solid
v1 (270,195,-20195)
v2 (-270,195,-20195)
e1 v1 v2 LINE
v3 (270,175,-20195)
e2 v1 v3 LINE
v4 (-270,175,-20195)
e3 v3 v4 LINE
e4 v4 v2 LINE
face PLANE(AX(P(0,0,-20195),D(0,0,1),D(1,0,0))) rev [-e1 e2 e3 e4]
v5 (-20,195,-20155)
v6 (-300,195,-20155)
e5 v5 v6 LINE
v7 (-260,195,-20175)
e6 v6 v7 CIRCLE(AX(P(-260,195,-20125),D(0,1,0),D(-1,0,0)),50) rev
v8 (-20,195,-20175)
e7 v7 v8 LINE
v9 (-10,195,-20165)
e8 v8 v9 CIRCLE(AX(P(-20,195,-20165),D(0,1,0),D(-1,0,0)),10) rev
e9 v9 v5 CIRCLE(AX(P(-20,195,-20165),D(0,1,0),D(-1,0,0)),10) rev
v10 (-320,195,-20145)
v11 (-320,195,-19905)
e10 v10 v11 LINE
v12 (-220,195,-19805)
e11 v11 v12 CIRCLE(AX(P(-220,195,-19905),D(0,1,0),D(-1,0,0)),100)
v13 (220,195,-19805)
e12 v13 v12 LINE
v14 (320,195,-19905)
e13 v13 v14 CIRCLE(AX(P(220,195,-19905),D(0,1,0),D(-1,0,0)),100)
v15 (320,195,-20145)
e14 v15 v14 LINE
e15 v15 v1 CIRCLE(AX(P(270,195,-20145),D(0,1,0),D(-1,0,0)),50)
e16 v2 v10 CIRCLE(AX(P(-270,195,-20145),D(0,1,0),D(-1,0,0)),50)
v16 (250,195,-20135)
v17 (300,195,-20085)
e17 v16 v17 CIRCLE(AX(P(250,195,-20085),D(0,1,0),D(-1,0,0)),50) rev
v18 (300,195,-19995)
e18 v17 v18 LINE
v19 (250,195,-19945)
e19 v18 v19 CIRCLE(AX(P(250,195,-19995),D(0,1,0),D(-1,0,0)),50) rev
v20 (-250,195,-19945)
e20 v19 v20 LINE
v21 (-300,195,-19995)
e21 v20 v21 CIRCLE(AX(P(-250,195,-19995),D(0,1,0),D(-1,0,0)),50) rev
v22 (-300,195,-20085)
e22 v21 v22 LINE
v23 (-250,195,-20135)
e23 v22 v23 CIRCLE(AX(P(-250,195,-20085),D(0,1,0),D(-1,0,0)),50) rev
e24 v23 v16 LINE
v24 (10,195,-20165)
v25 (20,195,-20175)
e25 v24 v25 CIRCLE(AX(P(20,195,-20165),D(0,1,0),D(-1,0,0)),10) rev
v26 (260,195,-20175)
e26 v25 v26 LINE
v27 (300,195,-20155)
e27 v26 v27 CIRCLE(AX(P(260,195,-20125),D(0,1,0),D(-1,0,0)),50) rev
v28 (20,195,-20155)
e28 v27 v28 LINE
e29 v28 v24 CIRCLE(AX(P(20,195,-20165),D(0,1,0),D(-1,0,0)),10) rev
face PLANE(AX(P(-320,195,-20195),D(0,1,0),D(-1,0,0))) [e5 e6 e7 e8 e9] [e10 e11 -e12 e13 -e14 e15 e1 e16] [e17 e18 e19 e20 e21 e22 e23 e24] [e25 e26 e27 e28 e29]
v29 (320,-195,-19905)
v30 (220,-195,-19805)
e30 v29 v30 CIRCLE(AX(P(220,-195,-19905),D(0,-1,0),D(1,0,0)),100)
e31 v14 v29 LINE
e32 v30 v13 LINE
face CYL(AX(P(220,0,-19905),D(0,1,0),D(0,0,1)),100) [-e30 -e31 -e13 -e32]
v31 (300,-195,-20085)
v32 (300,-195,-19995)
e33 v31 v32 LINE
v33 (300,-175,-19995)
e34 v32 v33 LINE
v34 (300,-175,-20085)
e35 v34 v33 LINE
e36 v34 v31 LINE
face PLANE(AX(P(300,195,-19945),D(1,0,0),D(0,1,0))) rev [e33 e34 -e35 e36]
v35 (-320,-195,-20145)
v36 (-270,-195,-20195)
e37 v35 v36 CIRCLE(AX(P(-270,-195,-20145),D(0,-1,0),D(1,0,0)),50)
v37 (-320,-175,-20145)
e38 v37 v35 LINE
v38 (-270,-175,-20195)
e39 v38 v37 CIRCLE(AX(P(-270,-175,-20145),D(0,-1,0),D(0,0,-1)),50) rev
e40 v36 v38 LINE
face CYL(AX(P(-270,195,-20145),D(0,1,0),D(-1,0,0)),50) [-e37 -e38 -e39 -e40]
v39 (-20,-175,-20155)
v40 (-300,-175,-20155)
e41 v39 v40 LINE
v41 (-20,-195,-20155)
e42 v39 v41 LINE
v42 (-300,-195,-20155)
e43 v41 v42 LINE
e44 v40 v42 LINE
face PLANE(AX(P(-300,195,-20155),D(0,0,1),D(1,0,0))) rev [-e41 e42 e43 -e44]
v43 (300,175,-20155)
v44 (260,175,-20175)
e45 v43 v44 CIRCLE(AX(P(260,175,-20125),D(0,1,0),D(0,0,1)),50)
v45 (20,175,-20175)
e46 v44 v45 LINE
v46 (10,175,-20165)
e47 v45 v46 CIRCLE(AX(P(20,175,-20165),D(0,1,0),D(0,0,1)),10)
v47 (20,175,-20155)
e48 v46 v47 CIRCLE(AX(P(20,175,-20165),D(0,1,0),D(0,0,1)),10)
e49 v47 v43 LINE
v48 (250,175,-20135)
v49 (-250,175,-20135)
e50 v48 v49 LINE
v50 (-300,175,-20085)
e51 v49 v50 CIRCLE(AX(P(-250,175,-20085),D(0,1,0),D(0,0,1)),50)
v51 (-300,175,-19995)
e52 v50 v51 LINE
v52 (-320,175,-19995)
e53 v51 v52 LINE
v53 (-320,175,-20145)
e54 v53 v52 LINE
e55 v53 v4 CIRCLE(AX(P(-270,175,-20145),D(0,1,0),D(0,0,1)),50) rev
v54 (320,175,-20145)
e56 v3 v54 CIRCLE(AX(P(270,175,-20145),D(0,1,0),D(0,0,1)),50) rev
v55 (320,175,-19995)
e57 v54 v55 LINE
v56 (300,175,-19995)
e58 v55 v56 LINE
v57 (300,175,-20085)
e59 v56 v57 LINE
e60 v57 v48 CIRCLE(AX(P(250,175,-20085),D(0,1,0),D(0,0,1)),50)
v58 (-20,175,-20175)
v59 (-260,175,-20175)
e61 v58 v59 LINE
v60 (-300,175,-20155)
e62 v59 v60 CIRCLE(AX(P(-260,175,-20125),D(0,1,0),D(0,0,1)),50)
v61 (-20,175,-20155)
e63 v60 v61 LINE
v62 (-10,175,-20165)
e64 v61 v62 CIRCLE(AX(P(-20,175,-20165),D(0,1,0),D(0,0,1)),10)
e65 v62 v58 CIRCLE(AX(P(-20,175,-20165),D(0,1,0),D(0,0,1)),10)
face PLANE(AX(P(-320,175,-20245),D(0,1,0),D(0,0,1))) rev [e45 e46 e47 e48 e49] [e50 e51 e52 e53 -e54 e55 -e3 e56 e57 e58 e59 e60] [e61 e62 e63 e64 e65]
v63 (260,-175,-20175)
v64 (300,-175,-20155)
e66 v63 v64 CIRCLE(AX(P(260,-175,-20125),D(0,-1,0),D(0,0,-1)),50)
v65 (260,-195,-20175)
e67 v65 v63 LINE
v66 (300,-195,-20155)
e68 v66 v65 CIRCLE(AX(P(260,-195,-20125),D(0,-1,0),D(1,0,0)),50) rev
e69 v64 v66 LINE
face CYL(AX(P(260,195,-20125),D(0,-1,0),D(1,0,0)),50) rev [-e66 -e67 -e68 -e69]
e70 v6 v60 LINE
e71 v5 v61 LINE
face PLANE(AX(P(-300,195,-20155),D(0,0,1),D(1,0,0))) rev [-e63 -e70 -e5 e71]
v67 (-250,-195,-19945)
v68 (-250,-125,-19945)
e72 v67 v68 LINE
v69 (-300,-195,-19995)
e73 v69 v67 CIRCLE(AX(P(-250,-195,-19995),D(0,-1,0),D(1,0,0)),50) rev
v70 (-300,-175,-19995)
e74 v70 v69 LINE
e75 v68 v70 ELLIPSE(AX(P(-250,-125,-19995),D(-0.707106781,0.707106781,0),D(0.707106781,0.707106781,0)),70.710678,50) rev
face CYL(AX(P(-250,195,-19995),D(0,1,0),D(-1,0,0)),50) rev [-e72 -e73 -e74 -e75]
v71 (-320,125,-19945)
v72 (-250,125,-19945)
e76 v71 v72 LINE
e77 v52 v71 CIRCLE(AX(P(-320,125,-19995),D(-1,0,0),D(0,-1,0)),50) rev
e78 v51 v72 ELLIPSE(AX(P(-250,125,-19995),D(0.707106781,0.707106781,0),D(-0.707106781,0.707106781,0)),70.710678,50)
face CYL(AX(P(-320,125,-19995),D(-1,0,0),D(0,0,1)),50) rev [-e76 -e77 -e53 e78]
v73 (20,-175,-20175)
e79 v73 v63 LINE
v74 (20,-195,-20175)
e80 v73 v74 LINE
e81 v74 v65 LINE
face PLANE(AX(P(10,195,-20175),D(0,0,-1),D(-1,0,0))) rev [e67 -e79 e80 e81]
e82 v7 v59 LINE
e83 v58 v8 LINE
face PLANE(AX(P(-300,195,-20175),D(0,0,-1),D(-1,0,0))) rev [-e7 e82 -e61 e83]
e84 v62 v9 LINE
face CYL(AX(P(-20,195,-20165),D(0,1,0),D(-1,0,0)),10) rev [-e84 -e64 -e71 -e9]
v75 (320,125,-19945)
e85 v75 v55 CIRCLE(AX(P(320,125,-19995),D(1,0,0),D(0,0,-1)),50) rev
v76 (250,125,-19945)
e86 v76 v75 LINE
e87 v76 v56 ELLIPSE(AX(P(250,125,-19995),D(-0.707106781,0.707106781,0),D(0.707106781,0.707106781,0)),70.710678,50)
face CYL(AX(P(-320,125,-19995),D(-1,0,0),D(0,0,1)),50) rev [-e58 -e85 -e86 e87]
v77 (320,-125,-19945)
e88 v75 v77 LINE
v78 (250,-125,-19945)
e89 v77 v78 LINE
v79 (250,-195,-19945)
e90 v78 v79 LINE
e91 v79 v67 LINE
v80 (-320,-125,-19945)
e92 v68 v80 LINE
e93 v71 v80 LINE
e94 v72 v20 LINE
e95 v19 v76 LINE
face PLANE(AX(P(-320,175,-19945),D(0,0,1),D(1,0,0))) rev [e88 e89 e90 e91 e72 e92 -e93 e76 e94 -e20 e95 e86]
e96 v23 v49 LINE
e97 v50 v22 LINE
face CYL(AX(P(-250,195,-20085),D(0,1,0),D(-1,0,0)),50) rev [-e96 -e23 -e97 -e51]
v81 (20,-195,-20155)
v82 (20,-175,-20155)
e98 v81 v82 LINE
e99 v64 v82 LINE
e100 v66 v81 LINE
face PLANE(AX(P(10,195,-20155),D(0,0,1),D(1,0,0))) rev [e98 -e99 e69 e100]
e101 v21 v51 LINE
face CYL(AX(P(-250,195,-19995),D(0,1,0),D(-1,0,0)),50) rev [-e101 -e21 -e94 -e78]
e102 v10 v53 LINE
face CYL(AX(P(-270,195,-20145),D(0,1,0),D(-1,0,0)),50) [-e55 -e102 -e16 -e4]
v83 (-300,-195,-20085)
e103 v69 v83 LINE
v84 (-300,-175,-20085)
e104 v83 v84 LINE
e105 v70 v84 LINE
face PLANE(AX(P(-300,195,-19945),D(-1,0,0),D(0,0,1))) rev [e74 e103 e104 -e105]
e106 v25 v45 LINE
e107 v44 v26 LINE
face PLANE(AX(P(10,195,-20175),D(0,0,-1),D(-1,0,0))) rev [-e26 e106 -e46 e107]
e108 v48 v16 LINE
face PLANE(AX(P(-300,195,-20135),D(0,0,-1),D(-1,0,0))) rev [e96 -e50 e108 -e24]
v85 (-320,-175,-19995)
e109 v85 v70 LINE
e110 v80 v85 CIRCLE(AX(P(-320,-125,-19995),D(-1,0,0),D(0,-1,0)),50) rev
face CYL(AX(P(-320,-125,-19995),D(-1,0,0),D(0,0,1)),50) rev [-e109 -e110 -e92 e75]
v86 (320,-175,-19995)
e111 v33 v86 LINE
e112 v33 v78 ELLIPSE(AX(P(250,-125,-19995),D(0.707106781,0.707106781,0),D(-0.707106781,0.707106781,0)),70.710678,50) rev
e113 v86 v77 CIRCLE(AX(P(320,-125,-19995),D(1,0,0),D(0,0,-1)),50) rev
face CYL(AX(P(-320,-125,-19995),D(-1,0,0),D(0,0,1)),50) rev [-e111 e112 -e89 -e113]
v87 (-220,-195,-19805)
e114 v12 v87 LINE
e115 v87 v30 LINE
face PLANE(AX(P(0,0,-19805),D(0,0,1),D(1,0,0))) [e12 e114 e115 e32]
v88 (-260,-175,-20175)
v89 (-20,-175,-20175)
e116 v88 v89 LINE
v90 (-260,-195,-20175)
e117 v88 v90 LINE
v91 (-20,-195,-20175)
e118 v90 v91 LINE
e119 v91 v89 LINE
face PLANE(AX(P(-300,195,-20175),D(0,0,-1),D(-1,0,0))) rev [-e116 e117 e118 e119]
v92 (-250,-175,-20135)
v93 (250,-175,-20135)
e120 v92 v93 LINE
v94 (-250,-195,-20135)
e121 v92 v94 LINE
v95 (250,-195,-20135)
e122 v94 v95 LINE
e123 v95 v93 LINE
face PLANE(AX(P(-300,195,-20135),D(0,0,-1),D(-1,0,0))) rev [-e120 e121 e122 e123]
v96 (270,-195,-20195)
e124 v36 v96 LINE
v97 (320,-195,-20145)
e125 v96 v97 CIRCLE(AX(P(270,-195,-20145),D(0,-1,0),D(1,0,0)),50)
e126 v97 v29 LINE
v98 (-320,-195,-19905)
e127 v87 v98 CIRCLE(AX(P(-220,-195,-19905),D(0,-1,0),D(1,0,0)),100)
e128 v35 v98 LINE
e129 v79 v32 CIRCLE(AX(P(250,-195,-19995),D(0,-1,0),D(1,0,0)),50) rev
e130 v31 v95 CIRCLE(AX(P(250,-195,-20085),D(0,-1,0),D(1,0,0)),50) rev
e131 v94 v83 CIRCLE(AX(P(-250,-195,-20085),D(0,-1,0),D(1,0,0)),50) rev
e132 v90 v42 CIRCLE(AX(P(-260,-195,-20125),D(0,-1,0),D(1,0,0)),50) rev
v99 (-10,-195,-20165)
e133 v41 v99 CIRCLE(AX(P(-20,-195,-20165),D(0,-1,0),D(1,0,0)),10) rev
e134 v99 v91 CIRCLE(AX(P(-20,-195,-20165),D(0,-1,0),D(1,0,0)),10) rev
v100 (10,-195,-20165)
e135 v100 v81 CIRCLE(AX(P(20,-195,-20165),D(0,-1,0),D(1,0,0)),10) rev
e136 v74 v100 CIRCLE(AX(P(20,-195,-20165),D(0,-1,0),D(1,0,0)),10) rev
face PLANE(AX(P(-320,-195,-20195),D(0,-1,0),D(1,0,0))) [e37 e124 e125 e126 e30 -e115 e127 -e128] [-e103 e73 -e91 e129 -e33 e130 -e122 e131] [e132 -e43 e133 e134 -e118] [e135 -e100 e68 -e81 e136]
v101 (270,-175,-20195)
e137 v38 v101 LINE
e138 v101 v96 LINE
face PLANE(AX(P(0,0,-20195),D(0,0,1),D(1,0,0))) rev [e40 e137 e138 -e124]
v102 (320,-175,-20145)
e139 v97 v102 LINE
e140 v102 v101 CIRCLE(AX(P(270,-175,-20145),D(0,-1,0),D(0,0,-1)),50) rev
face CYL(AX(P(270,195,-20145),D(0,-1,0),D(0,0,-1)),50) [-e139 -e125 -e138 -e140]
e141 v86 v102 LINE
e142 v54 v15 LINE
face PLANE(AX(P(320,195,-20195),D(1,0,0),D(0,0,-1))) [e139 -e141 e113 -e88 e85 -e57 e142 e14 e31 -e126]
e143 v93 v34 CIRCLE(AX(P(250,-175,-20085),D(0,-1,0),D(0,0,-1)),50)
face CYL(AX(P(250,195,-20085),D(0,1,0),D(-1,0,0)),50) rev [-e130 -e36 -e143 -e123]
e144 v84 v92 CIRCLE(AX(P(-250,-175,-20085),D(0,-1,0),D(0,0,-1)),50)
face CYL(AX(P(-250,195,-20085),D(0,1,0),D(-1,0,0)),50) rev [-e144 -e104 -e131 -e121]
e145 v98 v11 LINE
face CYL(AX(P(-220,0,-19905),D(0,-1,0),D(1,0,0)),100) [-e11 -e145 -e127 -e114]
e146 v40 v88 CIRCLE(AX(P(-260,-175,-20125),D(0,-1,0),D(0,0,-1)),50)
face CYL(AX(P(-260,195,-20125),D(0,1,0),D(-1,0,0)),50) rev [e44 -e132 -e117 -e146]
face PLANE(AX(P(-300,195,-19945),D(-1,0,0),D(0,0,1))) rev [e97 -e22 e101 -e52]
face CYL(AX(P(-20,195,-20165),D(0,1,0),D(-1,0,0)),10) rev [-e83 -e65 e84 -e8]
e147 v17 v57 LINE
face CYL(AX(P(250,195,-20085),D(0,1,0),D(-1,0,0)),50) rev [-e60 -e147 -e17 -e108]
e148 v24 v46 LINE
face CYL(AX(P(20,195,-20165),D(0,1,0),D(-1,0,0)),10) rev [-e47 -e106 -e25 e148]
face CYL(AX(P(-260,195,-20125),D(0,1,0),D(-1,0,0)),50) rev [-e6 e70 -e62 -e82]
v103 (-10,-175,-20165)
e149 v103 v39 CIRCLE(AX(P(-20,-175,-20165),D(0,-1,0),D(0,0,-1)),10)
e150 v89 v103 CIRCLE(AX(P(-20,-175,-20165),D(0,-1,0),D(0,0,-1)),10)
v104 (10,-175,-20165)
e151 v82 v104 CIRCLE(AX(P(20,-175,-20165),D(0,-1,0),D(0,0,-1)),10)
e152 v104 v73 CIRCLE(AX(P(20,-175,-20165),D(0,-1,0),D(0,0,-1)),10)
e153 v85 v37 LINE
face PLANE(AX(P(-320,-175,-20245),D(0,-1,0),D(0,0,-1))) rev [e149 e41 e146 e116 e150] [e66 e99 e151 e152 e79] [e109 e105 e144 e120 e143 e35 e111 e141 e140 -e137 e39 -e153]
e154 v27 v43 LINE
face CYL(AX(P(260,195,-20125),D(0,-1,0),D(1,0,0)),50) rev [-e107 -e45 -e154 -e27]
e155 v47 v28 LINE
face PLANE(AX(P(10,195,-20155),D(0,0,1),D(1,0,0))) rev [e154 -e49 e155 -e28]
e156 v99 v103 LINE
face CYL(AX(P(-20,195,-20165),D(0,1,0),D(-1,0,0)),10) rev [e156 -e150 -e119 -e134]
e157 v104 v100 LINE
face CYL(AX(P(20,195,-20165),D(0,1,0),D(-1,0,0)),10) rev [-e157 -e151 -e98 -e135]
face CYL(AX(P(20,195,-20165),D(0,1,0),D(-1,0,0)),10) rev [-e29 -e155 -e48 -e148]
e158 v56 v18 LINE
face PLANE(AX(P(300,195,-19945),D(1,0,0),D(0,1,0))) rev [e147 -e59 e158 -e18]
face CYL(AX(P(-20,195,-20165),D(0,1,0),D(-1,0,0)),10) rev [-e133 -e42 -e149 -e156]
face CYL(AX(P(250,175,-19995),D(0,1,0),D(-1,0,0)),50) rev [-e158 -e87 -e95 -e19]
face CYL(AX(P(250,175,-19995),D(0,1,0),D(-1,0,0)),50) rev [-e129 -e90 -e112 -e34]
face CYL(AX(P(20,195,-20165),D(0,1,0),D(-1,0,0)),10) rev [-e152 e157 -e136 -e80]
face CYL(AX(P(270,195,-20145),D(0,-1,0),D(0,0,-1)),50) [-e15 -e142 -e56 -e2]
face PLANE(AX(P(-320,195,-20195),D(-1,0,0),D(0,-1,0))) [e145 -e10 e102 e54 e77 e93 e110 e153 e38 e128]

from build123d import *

# Parameters (mm, degrees)
BOSS_EXTRUDE1_DEPTH      = 195
BOSS_EXTRUDE1_DEPTH_BACK = 195
BOSS_EXTRUDE1_START      = -20000
SKETCH1_W                = 640
SKETCH1_H                = 390
SKETCH2_W                = 300
SKETCH2_H                = 350
CUT_EXTRUDE1_DEPTH       = 20207.079530676
SKETCH3_W                = 290
SKETCH3_H                = 20
SKETCH3_W_2              = 600
SKETCH3_H_2              = 190
CUT_EXTRUDE2_DEPTH       = 20202.300081925
FILLET1_R                = 50
FILLET2_R                = 10
FILLET4_R                = 100


# Some blends are built 0.0001 mm under size
with BuildPart() as part:
    # Sketch1 → Boss-Extrude1 (new, two sides: drawn at the far end of the back side and taken through both)
    with BuildSketch(Plane.XY.offset(BOSS_EXTRUDE1_START - BOSS_EXTRUDE1_DEPTH_BACK)):
        Rectangle(SKETCH1_W, SKETCH1_H)
    extrude(amount=BOSS_EXTRUDE1_DEPTH + BOSS_EXTRUDE1_DEPTH_BACK)

    # Sketch2 → Cut-Extrude1 (cut, through all)
    with BuildSketch(Plane(origin=(320, 0, 0), x_dir=(0, 0, -1), z_dir=(1, 0, 0))):
        with Locations((20095, 0)):
            Rectangle(SKETCH2_W, SKETCH2_H)
    extrude(amount=-CUT_EXTRUDE1_DEPTH, mode=Mode.SUBTRACT)

    # Sketch3 → Cut-Extrude2 (cut, through all)
    with BuildSketch(Plane.XZ.offset(195)):
        with Locations((-155, -20165)):
            Rectangle(SKETCH3_W, SKETCH3_H)
        with Locations((155, -20165)):
            Rectangle(SKETCH3_W, SKETCH3_H)
        with Locations((0, -20040)):
            Rectangle(SKETCH3_W_2, SKETCH3_H_2)
    extrude(amount=-CUT_EXTRUDE2_DEPTH, mode=Mode.SUBTRACT)

    # Fillet1
    # the kernel refuses this fillet: 50 mm, written as the material it adds along each edge
    with BuildSketch(Plane(origin=(300, -195, -20135), x_dir=(-1, 0, 0), z_dir=(0, 1, 0)), Plane(origin=(-300, -195, -20135), x_dir=(0, 0, 1), z_dir=(0, 1, 0)), Plane(origin=(300, 175, -19945), x_dir=(0, 0, -1), z_dir=(0, 1, 0)), Plane(origin=(-300, -175, -19945), x_dir=(0, 1, 0), z_dir=(-1, 0, 0)), Plane(origin=(320, -175, -19945), x_dir=(0, 1, 0), z_dir=(-1, 0, 0)), Plane(origin=(-300, -195, -19945), x_dir=(1, 0, 0), z_dir=(0, 1, 0))) as fillet1_piece_1:
        with BuildLine():
            CenterArc((FILLET1_R, FILLET1_R), FILLET1_R, 180, 90)
            Line((0, FILLET1_R), (0, 0))
            Line((0, 0), (FILLET1_R, 0))
        make_face()
    extrude(amount=20)
    with BuildSketch(Plane(origin=(300, 175, -20135), x_dir=(0, 0, 1), z_dir=(0, 1, 0)), Plane(origin=(-300, 175, -20135), x_dir=(1, 0, 0), z_dir=(0, 1, 0)), Plane(origin=(300, -195, -19945), x_dir=(-1, 0, 0), z_dir=(0, 1, 0)), Plane(origin=(-300, 175, -19945), x_dir=(0, -1, 0), z_dir=(-1, 0, 0)), Plane(origin=(320, 175, -19945), x_dir=(0, -1, 0), z_dir=(-1, 0, 0)), Plane(origin=(-300, 175, -19945), x_dir=(0, 0, -1), z_dir=(0, 1, 0))) as fillet1_piece_2:
        with BuildLine():
            CenterArc((FILLET1_R, -FILLET1_R), FILLET1_R, 90, 90)
            Line((0, -FILLET1_R), (0, 0))
            Line((0, 0), (FILLET1_R, 0))
        make_face()
    extrude(amount=20)
    with BuildSketch(Plane(origin=(-300, -195, -20175), x_dir=(0, 0, 1), z_dir=(0, 1, 0))) as fillet1_piece_3:
        with BuildLine():
            CenterArc((50, 40), FILLET1_R, 180, 53.130102354)
            Line((0, 40), (0, 0))
            Line((0, 0), (20, 0))
        make_face()
    extrude(amount=20)
    with BuildSketch(Plane(origin=(-300, 175, -20175), x_dir=(1, 0, 0), z_dir=(0, 1, 0))) as fillet1_piece_4:
        with BuildLine():
            CenterArc((40, -50), FILLET1_R, 90, 53.130102354)
            Line((0, -20), (0, 0))
            Line((0, 0), (40, 0))
        make_face()
    extrude(amount=20)
    with BuildSketch(Plane(origin=(300, -195, -20175), x_dir=(-1, 0, 0), z_dir=(0, 1, 0))) as fillet1_piece_5:
        with BuildLine():
            CenterArc((40, 50), FILLET1_R, 216.869897646, 53.130102354)
            Line((0, 20), (0, 0))
            Line((0, 0), (40, 0))
        make_face()
    extrude(amount=20)
    with BuildSketch(Plane(origin=(300, 175, -20175), x_dir=(0, 0, 1), z_dir=(0, 1, 0))) as fillet1_piece_6:
        with BuildLine():
            CenterArc((50, -40), FILLET1_R, 126.869897646, 53.130102354)
            Line((0, -40), (0, 0))
            Line((0, 0), (20, 0))
        make_face()
    extrude(amount=20)
    with BuildSketch(Plane(origin=(320, -175, -19945), x_dir=(0, 1, 0), z_dir=(-1, 0, 0))) as fillet1_piece_7a_section:
        with BuildLine():
            CenterArc((FILLET1_R, FILLET1_R), FILLET1_R, 180, 90)
            Line((0, FILLET1_R), (0, 0))
            Line((0, 0), (FILLET1_R, 0))
        make_face()
    fillet1_piece_7a = extrude(amount=145, mode=Mode.PRIVATE)
    fillet1_piece_7a = split(fillet1_piece_7a, bisect_by=Plane(origin=(300, -175, -19945), z_dir=(-1, 0, 0)), keep=Keep.TOP, mode=Mode.PRIVATE)
    with BuildSketch(Plane(origin=(300, -195, -19945), x_dir=(-1, 0, 0), z_dir=(0, 1, 0))) as fillet1_piece_7b_section:
        with BuildLine():
            CenterArc((FILLET1_R, -FILLET1_R), FILLET1_R, 90, 90)
            Line((0, -FILLET1_R), (0, 0))
            Line((0, 0), (FILLET1_R, 0))
        make_face()
    fillet1_piece_7b = extrude(amount=145, mode=Mode.PRIVATE)
    fillet1_piece_7b = split(fillet1_piece_7b, bisect_by=Plane(origin=(300, -175, -19945), z_dir=(0, 1, 0)), keep=Keep.TOP, mode=Mode.PRIVATE)
    fillet1_piece_7 = fillet1_piece_7a & fillet1_piece_7b
    add(fillet1_piece_7)
    with BuildSketch(Plane(origin=(300, 50, -19945), x_dir=(0, 0, -1), z_dir=(0, 1, 0))) as fillet1_piece_8a_section:
        with BuildLine():
            CenterArc((FILLET1_R, FILLET1_R), FILLET1_R, 180, 90)
            Line((0, FILLET1_R), (0, 0))
            Line((0, 0), (FILLET1_R, 0))
        make_face()
    fillet1_piece_8a = extrude(amount=145, mode=Mode.PRIVATE)
    fillet1_piece_8a = split(fillet1_piece_8a, bisect_by=Plane(origin=(300, 175, -19945), z_dir=(0, -1, 0)), keep=Keep.TOP, mode=Mode.PRIVATE)
    with BuildSketch(Plane(origin=(320, 175, -19945), x_dir=(0, -1, 0), z_dir=(-1, 0, 0))) as fillet1_piece_8b_section:
        with BuildLine():
            CenterArc((FILLET1_R, -FILLET1_R), FILLET1_R, 90, 90)
            Line((0, -FILLET1_R), (0, 0))
            Line((0, 0), (FILLET1_R, 0))
        make_face()
    fillet1_piece_8b = extrude(amount=145, mode=Mode.PRIVATE)
    fillet1_piece_8b = split(fillet1_piece_8b, bisect_by=Plane(origin=(300, 175, -19945), z_dir=(-1, 0, 0)), keep=Keep.TOP, mode=Mode.PRIVATE)
    fillet1_piece_8 = fillet1_piece_8a & fillet1_piece_8b
    add(fillet1_piece_8)
    with BuildSketch(Plane(origin=(-300, 50, -19945), x_dir=(0, 0, -1), z_dir=(0, 1, 0))) as fillet1_piece_9a_section:
        with BuildLine():
            CenterArc((FILLET1_R, -FILLET1_R), FILLET1_R, 90, 90)
            Line((0, -FILLET1_R), (0, 0))
            Line((0, 0), (FILLET1_R, 0))
        make_face()
    fillet1_piece_9a = extrude(amount=145, mode=Mode.PRIVATE)
    fillet1_piece_9a = split(fillet1_piece_9a, bisect_by=Plane(origin=(-300, 175, -19945), z_dir=(0, -1, 0)), keep=Keep.TOP, mode=Mode.PRIVATE)
    with BuildSketch(Plane(origin=(-175, 175, -19945), x_dir=(0, -1, 0), z_dir=(-1, 0, 0))) as fillet1_piece_9b_section:
        with BuildLine():
            CenterArc((FILLET1_R, -FILLET1_R), FILLET1_R, 90, 90)
            Line((0, -FILLET1_R), (0, 0))
            Line((0, 0), (FILLET1_R, 0))
        make_face()
    fillet1_piece_9b = extrude(amount=145, mode=Mode.PRIVATE)
    fillet1_piece_9b = split(fillet1_piece_9b, bisect_by=Plane(origin=(-300, 175, -19945), z_dir=(1, 0, 0)), keep=Keep.TOP, mode=Mode.PRIVATE)
    fillet1_piece_9 = fillet1_piece_9a & fillet1_piece_9b
    add(fillet1_piece_9)
    with BuildSketch(Plane(origin=(-300, -195, -19945), x_dir=(1, 0, 0), z_dir=(0, 1, 0))) as fillet1_piece_10a_section:
        with BuildLine():
            CenterArc((FILLET1_R, FILLET1_R), FILLET1_R, 180, 90)
            Line((0, FILLET1_R), (0, 0))
            Line((0, 0), (FILLET1_R, 0))
        make_face()
    fillet1_piece_10a = extrude(amount=145, mode=Mode.PRIVATE)
    fillet1_piece_10a = split(fillet1_piece_10a, bisect_by=Plane(origin=(-300, -175, -19945), z_dir=(0, 1, 0)), keep=Keep.TOP, mode=Mode.PRIVATE)
    with BuildSketch(Plane(origin=(-175, -175, -19945), x_dir=(0, 1, 0), z_dir=(-1, 0, 0))) as fillet1_piece_10b_section:
        with BuildLine():
            CenterArc((FILLET1_R, FILLET1_R), FILLET1_R, 180, 90)
            Line((0, FILLET1_R), (0, 0))
            Line((0, 0), (FILLET1_R, 0))
        make_face()
    fillet1_piece_10b = extrude(amount=145, mode=Mode.PRIVATE)
    fillet1_piece_10b = split(fillet1_piece_10b, bisect_by=Plane(origin=(-300, -175, -19945), z_dir=(1, 0, 0)), keep=Keep.TOP, mode=Mode.PRIVATE)
    fillet1_piece_10 = fillet1_piece_10a & fillet1_piece_10b
    add(fillet1_piece_10)
    # the kernel refuses this fillet: 50 mm, written as the material it takes off along each edge
    with BuildSketch(Plane(origin=(320, -50, -20195), x_dir=(-1, 0, 0), z_dir=(0, -1, 0)), Plane(origin=(-320, -320, -20195), x_dir=(1, 0, 0), z_dir=(0, 1, 0)), Plane(origin=(320, 320, -20195), x_dir=(-1, 0, 0), z_dir=(0, -1, 0))) as fillet1_2_piece_1:
        with BuildLine():
            CenterArc((FILLET1_R, -FILLET1_R), FILLET1_R, 90, 90)
            Line((0, -FILLET1_R), (0, 0))
            Line((0, 0), (FILLET1_R, 0))
        make_face()
    extrude(amount=270, mode=Mode.SUBTRACT)
    with BuildSketch(Plane(origin=(-320, 50, -20195), x_dir=(0, 0, 1), z_dir=(0, 1, 0))) as fillet1_2_piece_2:
        with BuildLine():
            CenterArc((FILLET1_R, FILLET1_R), FILLET1_R, 180, 90)
            Line((0, FILLET1_R), (0, 0))
            Line((0, 0), (FILLET1_R, 0))
        make_face()
    extrude(amount=270, mode=Mode.SUBTRACT)

    # Fillet2
    fillet2_edges = [part.edges().sort_by_distance(p)[0] for p in [
        (-10, -185, -20175),
        (-10, 185, -20175),
        (10, -185, -20175),
        (10, 185, -20175),
        (10, 185, -20155),
        (10, -185, -20155),
        (-10, 185, -20155),
        (-10, -185, -20155),
    ]]
    fillet(fillet2_edges, radius=FILLET2_R - 0.0001)  # a hair under: the kernel refuses the full size

    # Fillet4
    fillet4_edges = [part.edges().sort_by_distance(p)[0] for p in [
        (-320, 0, -19805),
        (320, 0, -19805),
    ]]
    fillet(fillet4_edges, radius=FILLET4_R)


solid = part.part
